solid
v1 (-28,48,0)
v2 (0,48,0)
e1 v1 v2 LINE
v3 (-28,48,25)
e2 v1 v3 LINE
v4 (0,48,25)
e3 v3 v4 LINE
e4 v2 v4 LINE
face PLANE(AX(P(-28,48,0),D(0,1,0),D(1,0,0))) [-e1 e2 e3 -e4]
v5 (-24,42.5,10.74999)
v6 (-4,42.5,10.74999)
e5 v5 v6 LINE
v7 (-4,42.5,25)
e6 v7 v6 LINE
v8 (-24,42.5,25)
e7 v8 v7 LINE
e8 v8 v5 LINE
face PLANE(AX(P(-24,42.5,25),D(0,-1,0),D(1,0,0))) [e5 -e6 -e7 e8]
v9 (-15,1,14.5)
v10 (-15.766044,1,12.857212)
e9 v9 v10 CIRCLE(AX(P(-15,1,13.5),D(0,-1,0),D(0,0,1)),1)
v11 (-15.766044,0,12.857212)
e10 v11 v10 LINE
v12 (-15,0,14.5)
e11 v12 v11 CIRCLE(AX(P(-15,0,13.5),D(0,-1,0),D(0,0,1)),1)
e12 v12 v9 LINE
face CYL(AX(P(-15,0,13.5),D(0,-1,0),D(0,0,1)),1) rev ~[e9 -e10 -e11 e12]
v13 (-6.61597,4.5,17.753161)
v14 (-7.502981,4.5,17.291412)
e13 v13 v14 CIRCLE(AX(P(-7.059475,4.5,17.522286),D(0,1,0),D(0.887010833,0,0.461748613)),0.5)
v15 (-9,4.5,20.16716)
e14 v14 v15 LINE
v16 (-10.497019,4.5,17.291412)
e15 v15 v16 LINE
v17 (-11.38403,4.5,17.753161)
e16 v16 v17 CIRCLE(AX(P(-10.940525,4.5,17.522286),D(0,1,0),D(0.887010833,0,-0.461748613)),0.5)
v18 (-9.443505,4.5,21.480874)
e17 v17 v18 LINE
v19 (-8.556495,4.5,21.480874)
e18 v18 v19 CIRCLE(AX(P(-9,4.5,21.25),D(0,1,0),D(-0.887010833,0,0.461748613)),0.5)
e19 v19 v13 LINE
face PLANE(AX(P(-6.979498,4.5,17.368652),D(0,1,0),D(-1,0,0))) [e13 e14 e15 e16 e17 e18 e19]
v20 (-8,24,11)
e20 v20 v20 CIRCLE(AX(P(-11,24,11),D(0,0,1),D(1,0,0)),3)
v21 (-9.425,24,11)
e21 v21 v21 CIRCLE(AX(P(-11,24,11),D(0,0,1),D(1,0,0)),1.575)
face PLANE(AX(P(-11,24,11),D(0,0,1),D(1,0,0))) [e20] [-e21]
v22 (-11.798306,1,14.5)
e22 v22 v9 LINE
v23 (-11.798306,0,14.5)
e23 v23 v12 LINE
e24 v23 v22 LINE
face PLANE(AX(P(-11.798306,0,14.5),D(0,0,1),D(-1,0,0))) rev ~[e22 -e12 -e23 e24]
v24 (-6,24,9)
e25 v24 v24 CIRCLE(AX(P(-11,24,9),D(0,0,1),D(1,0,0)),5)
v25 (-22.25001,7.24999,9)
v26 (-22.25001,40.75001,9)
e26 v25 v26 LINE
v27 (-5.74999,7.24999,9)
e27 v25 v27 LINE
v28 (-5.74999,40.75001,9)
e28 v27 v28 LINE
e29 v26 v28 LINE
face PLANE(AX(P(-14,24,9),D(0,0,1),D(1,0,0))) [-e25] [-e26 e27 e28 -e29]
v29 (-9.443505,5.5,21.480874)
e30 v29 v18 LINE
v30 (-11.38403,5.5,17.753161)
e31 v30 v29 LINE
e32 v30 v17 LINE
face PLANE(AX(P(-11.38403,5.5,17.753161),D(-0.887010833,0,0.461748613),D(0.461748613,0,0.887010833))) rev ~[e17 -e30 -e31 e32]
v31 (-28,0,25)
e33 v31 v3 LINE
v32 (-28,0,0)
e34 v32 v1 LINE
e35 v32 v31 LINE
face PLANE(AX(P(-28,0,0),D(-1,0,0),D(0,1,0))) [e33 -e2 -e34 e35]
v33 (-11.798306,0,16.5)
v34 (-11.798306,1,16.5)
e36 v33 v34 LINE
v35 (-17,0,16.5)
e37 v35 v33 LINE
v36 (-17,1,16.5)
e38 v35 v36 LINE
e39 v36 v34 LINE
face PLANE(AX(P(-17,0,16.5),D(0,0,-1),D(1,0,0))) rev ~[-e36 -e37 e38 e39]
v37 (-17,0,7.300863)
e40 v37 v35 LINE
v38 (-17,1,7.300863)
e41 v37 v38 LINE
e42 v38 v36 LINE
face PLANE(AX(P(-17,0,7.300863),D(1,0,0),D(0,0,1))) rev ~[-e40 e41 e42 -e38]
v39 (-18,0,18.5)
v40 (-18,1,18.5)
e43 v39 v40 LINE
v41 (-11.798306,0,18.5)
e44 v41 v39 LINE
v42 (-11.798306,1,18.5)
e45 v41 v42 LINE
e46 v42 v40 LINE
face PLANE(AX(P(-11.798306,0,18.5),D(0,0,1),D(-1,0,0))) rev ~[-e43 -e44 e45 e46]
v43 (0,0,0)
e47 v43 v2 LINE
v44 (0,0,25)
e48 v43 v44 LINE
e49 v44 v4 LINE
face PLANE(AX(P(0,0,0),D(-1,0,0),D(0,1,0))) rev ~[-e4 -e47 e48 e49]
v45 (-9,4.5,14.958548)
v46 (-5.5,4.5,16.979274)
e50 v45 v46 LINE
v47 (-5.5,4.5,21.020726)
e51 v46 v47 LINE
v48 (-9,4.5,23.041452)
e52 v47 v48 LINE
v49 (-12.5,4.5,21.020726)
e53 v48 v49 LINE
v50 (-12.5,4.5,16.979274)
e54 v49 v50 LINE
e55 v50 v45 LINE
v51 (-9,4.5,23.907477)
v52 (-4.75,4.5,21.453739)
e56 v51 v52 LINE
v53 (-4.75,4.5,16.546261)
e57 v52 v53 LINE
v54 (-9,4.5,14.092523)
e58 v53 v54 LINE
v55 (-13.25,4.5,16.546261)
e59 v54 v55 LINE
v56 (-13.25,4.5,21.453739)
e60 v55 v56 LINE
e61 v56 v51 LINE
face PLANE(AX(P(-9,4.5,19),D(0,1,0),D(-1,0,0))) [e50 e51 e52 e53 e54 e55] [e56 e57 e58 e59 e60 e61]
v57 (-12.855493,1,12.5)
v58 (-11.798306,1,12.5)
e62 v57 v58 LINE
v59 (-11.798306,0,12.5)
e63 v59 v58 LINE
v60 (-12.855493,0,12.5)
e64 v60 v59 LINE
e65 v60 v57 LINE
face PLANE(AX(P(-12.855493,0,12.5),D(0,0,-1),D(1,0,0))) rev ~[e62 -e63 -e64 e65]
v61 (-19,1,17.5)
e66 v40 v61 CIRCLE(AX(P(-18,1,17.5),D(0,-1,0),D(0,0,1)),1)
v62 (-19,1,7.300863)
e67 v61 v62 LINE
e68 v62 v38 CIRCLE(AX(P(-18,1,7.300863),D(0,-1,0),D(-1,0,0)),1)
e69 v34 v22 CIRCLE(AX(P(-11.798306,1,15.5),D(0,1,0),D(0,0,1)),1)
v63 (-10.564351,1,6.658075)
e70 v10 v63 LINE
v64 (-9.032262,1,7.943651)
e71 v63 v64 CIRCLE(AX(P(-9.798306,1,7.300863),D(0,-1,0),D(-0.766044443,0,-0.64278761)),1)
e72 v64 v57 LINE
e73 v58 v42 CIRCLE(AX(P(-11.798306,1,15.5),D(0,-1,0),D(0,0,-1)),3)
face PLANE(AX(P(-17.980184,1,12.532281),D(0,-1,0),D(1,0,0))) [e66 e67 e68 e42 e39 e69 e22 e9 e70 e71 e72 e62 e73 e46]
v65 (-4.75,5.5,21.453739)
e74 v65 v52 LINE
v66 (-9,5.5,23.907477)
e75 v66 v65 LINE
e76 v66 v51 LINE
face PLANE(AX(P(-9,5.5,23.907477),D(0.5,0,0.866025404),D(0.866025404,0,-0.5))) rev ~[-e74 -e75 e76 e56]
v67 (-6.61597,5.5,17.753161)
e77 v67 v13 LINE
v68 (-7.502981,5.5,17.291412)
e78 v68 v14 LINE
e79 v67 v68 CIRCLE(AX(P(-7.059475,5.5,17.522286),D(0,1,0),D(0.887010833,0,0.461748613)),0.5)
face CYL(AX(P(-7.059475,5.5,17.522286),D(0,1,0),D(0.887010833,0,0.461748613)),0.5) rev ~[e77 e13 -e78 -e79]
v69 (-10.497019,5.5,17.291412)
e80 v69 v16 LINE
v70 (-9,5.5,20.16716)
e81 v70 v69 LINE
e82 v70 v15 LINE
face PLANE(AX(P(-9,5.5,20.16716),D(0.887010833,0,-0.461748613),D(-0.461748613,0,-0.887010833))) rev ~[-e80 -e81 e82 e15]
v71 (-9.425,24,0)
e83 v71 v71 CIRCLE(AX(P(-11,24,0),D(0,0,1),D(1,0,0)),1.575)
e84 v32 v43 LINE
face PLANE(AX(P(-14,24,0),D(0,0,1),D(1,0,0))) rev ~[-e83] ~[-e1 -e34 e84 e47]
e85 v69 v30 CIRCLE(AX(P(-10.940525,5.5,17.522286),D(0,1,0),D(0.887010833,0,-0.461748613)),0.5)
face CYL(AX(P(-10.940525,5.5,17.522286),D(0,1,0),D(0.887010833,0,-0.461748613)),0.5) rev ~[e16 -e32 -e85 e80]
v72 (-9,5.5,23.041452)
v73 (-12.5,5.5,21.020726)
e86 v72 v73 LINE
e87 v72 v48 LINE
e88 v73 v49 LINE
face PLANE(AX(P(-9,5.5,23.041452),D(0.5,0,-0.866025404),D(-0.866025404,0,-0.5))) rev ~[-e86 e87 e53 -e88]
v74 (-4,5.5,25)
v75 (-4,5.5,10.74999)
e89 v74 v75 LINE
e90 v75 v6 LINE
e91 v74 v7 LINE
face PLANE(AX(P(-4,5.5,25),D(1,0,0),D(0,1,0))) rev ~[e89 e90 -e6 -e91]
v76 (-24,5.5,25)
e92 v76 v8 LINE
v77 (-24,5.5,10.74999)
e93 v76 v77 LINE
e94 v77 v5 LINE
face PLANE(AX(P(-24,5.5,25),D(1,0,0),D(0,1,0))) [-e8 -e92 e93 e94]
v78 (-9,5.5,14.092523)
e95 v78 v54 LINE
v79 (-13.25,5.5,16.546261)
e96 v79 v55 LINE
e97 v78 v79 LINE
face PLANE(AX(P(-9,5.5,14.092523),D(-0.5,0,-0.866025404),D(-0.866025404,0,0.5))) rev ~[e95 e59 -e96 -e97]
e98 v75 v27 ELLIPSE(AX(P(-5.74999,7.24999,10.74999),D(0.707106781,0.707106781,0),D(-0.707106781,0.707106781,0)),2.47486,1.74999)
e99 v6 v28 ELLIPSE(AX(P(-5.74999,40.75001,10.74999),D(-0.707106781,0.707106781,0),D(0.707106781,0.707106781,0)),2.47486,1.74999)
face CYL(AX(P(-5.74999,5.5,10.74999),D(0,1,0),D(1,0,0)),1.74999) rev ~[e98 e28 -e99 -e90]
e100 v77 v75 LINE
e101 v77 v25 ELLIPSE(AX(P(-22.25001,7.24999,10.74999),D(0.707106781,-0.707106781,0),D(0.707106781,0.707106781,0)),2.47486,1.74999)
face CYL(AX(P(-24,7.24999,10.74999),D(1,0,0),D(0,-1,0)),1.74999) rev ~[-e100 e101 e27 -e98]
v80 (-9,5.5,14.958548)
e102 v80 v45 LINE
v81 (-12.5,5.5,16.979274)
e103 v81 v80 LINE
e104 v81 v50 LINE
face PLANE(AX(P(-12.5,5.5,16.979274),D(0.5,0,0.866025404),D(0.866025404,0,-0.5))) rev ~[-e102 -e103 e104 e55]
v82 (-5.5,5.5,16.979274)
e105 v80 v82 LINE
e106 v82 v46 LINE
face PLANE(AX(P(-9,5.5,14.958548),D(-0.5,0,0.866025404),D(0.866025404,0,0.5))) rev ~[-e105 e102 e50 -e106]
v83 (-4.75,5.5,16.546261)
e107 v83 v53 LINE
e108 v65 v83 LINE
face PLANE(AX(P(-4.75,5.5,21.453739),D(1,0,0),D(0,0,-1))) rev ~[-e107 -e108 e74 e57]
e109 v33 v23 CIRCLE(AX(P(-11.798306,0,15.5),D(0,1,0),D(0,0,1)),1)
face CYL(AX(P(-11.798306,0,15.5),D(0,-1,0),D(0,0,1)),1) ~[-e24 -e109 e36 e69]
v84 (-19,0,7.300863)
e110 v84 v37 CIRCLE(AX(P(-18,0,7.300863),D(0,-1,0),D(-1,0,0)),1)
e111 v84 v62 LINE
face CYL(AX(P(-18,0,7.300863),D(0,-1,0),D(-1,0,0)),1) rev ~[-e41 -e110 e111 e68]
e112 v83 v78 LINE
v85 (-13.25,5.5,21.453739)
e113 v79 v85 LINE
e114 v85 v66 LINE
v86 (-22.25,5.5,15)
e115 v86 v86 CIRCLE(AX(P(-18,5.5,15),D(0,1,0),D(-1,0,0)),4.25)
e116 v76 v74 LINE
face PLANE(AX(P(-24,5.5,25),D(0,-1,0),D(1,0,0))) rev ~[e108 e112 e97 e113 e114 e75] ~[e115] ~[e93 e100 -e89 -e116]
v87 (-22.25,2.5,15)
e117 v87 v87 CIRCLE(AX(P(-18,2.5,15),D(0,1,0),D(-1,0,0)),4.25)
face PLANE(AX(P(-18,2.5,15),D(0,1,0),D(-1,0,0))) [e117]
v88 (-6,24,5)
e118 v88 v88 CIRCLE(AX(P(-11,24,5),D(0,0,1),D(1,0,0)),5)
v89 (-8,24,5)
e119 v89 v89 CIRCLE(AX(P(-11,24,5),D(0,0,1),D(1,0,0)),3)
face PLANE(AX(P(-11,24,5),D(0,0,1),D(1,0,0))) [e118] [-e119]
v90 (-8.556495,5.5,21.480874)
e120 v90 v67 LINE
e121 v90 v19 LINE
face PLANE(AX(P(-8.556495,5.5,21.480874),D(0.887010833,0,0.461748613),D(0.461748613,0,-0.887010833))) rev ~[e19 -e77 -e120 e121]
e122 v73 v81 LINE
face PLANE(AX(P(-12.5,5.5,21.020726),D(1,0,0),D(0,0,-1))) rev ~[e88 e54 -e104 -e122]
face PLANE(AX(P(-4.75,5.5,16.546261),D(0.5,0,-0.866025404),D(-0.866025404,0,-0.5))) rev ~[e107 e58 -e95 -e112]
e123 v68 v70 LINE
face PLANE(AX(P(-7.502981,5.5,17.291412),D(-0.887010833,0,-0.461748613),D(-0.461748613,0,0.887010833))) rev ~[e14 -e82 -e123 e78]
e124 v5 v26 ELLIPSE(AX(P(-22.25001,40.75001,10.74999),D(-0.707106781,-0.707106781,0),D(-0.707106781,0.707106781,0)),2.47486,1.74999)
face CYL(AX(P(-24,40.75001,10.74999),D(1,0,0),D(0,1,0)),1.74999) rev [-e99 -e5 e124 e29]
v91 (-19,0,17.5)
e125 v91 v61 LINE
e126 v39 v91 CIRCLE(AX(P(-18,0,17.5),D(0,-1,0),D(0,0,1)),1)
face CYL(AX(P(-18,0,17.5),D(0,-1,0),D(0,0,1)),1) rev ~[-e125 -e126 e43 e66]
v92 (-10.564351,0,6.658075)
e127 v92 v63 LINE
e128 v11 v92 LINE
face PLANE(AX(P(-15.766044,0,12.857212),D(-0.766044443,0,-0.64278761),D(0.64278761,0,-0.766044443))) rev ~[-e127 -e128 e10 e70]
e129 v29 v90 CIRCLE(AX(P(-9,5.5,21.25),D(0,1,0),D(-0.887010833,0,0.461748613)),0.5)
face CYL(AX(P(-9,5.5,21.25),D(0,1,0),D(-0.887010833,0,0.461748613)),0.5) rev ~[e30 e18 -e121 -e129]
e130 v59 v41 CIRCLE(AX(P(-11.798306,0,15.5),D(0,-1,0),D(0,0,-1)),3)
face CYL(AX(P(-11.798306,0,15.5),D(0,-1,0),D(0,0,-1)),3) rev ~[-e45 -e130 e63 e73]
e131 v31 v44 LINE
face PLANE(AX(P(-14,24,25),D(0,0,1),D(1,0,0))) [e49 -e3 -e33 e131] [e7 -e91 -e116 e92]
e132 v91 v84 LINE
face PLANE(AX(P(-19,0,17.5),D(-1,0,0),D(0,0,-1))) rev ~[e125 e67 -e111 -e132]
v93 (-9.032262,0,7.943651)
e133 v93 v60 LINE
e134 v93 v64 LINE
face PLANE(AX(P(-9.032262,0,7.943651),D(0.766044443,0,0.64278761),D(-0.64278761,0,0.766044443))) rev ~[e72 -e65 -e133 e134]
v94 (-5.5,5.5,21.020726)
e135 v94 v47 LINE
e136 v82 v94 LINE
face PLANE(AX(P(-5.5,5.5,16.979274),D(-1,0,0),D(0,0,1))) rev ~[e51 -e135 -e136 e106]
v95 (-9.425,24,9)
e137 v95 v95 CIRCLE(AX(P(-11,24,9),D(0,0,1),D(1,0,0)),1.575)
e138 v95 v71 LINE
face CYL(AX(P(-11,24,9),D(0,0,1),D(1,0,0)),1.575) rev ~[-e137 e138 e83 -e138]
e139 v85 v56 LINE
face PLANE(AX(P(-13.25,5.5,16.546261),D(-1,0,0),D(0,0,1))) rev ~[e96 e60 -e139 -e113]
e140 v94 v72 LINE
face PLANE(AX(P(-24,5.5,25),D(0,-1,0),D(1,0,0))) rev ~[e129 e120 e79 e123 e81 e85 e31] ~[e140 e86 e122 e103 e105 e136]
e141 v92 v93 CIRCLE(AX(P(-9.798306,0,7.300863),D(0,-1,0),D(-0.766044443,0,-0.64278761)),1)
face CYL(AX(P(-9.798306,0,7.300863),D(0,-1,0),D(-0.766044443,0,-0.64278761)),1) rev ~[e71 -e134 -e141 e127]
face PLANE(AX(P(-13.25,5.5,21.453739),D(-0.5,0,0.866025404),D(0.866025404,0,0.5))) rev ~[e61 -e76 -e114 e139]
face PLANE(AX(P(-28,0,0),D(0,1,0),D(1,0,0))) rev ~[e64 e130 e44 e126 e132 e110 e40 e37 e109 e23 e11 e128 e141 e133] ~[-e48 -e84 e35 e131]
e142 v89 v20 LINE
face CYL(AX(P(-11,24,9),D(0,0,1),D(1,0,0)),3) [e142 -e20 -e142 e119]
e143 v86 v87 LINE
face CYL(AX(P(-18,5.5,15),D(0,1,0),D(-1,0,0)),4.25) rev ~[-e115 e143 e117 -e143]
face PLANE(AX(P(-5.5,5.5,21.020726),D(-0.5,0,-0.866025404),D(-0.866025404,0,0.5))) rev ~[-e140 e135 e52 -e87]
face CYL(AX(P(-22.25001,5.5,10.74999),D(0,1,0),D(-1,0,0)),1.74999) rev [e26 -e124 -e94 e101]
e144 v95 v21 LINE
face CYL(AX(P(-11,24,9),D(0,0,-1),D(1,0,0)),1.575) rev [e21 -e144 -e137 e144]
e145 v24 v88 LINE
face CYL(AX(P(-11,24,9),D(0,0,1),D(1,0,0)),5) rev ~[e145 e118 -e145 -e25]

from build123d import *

# Parameters (mm, degrees)
F0_W      = 28
F0_H      = 48
F1_DEPTH  = 25
F2_W      = 20
F2_H      = 37
F3_DEPTH  = 16
F4_R      = 3
F4_R_2    = 1.575
F5_DEPTH  = 2
F6_R      = 5
F6_R_2    = 3
F7_DEPTH  = 4
F8_R      = 4.25
F9_DEPTH  = 3
F10_DEPTH = 9.001
F14_DEPTH = 1
F17_DEPTH = 1
F18_R     = 1.74999


# Not quite as in the source:
# - a fillet or chamfer is up to 0.001 mm smaller than in the source, because OpenCascade refuses the exact size


with BuildPart() as f1:
    # F0 (on Top) → F1 (new body)
    with BuildSketch(Plane.XY):
        with Locations((-14, 24)):
            Rectangle(F0_W, F0_H)
    extrude(amount=F1_DEPTH)

    # F2 (on face) → F3 (cut)
    with BuildSketch(Plane.XY.offset(25)):
        with Locations((-14, 24)):
            Rectangle(F2_W, F2_H)
    extrude(amount=-F3_DEPTH, mode=Mode.SUBTRACT)

    # F4 (on face) → F5 (join)
    with BuildSketch(Plane.XY.offset(9)):
        with Locations((-11, 24)):
            Circle(F4_R)
        with Locations((-11, 24)):
            Circle(F4_R_2, mode=Mode.SUBTRACT)
    extrude(amount=F5_DEPTH)

    # F6 (on face) → F7 (cut)
    with BuildSketch(Plane.XY.offset(9)):
        with Locations((-11, 24)):
            Circle(F6_R)
        with Locations((-11, 24)):
            Circle(F6_R_2, mode=Mode.SUBTRACT)
    extrude(amount=-F7_DEPTH, mode=Mode.SUBTRACT)

    # F8 (on face) → F9 (cut)
    with BuildSketch(Plane(origin=(0, 5.5, 0), x_dir=(-1, 0, 0), z_dir=(0, 1, 0))):
        with Locations((18, 15)):
            Circle(F8_R)
    extrude(amount=-F9_DEPTH, mode=Mode.SUBTRACT)

    # F10 (cut, through all): a face of the model
    f10_faces = [f1.faces().sort_by_distance(p)[0] for p in [
        (-11, 24, 9),
    ]]
    extrude(f10_faces, amount=-F10_DEPTH, mode=Mode.SUBTRACT)

    # F13 (on face) → F14 (cut)
    with BuildSketch(Plane.XZ):
        with BuildLine():
            ThreePointArc((-19, 7.3008629454), (-18, 6.3008629454), (-17, 7.3008629454))
            Line((-17, 7.3008629454), (-17, 16.5))
            Line((-17, 16.5), (-17, 18.5))
            Line((-17, 18.5), (-18, 18.5))
            ThreePointArc((-18, 18.5), (-18.7071067812, 18.2071067812), (-19, 17.5))
            Line((-19, 17.5), (-19, 7.3008629454))
        make_face()
        with BuildLine():
            Line((-17, 18.5), (-17, 16.5))
            Line((-17, 16.5), (-11.7983063839, 16.5))
            ThreePointArc((-11.7983063839, 16.5), (-10.7983063839, 15.5), (-11.7983063839, 14.5))
            Line((-11.7983063839, 14.5), (-15, 14.5))
            ThreePointArc((-15, 14.5), (-14.5773817383, 14.406307787), (-14.2339555569, 14.1427876097))
            Line((-14.2339555569, 14.1427876097), (-12.8554930795, 12.5))
            Line((-12.8554930795, 12.5), (-11.7983063839, 12.5))
            ThreePointArc((-11.7983063839, 12.5), (-8.7983063839, 15.5), (-11.7983063839, 18.5))
            Line((-11.7983063839, 18.5), (-17, 18.5))
        make_face()
        with BuildLine():
            ThreePointArc((-14.2339555569, 14.1427876097), (-14.5773817383, 14.406307787), (-15, 14.5))
            ThreePointArc((-15, 14.5), (-15.906307787, 13.9226182617), (-15.7660444431, 12.8572123903))
            ThreePointArc((-15.7660444431, 12.8572123903), (-15.4226182617, 12.593692213), (-15, 12.5))
            ThreePointArc((-15, 12.5), (-14.2928932188, 12.7928932188), (-14, 13.5))
            ThreePointArc((-14, 13.5), (-14.0603073792, 13.8420201433), (-14.2339555569, 14.1427876097))
        make_face()
        with BuildLine():
            Line((-9.0322619408, 7.9436505551), (-12.8554930795, 12.5))
            Line((-12.8554930795, 12.5), (-15, 12.5))
            ThreePointArc((-15, 12.5), (-15.4226182617, 12.593692213), (-15.7660444431, 12.8572123903))
            Line((-15.7660444431, 12.8572123903), (-10.564350827, 6.6580753357))
            ThreePointArc((-10.564350827, 6.6580753357), (-9.1555187742, 6.5348185023), (-9.0322619408, 7.9436505551))
        make_face()
        with BuildLine():
            Line((-15, 12.5), (-12.8554930795, 12.5))
            Line((-12.8554930795, 12.5), (-14.2339555569, 14.1427876097))
            ThreePointArc((-14.2339555569, 14.1427876097), (-14.0603073792, 13.8420201433), (-14, 13.5))
            ThreePointArc((-14, 13.5), (-14.2928932188, 12.7928932188), (-15, 12.5))
        make_face()
    extrude(amount=-F14_DEPTH, mode=Mode.SUBTRACT)

    # F16 (on face) → F17 (cut)
    with BuildSketch(Plane(origin=(0, 5.5, 0), x_dir=(-1, 0, 0), z_dir=(0, 1, 0))):
        Polygon((9, 14.0925227119), (13.25, 16.5462613559), (13.25, 21.4537386441), (9, 23.9074772881), (4.75, 21.4537386441), (4.75, 16.5462613559), align=None)
        Polygon((9, 14.9585481157), (5.5, 16.9792740578), (5.5, 21.0207259422), (9, 23.0414518843), (12.5, 21.0207259422), (12.5, 16.9792740578), align=None, mode=Mode.SUBTRACT)
        with BuildLine():
            Line((7.5029805213, 17.2914120527), (6.6159696882, 17.7531606659))
            ThreePointArc((6.6159696882, 17.7531606659), (6.8286007981, 17.0787809427), (7.5029805213, 17.2914120527))
        make_face()
        with BuildLine():
            ThreePointArc((8.5564945834, 21.0191256934), (8.5, 21.25), (8.5564945834, 21.4808743066))
            Line((8.5564945834, 21.4808743066), (6.6159696882, 17.7531606659))
            Line((6.6159696882, 17.7531606659), (7.5029805213, 17.2914120527))
            Line((7.5029805213, 17.2914120527), (9, 20.1671597149))
            Line((9, 20.1671597149), (8.5564945834, 21.0191256934))
        make_face()
        with BuildLine():
            Line((9, 20.1671597149), (9.4435054166, 21.0191256934))
            ThreePointArc((9.4435054166, 21.0191256934), (9, 20.75), (8.5564945834, 21.0191256934))
            Line((8.5564945834, 21.0191256934), (9, 20.1671597149))
        make_face()
        with BuildLine():
            ThreePointArc((9.4435054166, 21.0191256934), (9.4856710349, 21.1311570538), (9.5, 21.25))
            ThreePointArc((9.5, 21.25), (9.4856710349, 21.3688429462), (9.4435054166, 21.4808743066))
            ThreePointArc((9.4435054166, 21.4808743066), (9, 21.75), (8.5564945834, 21.4808743066))
            ThreePointArc((8.5564945834, 21.4808743066), (8.5, 21.25), (8.5564945834, 21.0191256934))
            ThreePointArc((8.5564945834, 21.0191256934), (9, 20.75), (9.4435054166, 21.0191256934))
        make_face()
        with BuildLine():
            ThreePointArc((9.4435054166, 21.4808743066), (9.4856710349, 21.3688429462), (9.5, 21.25))
            ThreePointArc((9.5, 21.25), (9.4856710349, 21.1311570538), (9.4435054166, 21.0191256934))
            Line((9.4435054166, 21.0191256934), (9, 20.1671597149))
            Line((9, 20.1671597149), (10.4970194787, 17.2914120527))
            Line((10.4970194787, 17.2914120527), (11.3840303118, 17.7531606659))
            Line((11.3840303118, 17.7531606659), (9.4435054166, 21.4808743066))
        make_face()
        with BuildLine():
            ThreePointArc((10.4970194787, 17.2914120527), (11.1713992019, 17.0787809427), (11.3840303118, 17.7531606659))
            Line((11.3840303118, 17.7531606659), (10.4970194787, 17.2914120527))
        make_face()
    extrude(amount=-F17_DEPTH, mode=Mode.SUBTRACT)

    # F18 (radius 1.75 in the source; OpenCascade refuses exactly that, so slightly less here)
    f18_edges = [f1.edges().sort_by_distance(p)[0] for p in [
        (-24, 24, 9),
        (-14, 42.5, 9),
        (-4, 24, 9),
        (-14, 5.5, 9),
    ]]
    fillet(f18_edges, radius=F18_R)


solid = f1.part
